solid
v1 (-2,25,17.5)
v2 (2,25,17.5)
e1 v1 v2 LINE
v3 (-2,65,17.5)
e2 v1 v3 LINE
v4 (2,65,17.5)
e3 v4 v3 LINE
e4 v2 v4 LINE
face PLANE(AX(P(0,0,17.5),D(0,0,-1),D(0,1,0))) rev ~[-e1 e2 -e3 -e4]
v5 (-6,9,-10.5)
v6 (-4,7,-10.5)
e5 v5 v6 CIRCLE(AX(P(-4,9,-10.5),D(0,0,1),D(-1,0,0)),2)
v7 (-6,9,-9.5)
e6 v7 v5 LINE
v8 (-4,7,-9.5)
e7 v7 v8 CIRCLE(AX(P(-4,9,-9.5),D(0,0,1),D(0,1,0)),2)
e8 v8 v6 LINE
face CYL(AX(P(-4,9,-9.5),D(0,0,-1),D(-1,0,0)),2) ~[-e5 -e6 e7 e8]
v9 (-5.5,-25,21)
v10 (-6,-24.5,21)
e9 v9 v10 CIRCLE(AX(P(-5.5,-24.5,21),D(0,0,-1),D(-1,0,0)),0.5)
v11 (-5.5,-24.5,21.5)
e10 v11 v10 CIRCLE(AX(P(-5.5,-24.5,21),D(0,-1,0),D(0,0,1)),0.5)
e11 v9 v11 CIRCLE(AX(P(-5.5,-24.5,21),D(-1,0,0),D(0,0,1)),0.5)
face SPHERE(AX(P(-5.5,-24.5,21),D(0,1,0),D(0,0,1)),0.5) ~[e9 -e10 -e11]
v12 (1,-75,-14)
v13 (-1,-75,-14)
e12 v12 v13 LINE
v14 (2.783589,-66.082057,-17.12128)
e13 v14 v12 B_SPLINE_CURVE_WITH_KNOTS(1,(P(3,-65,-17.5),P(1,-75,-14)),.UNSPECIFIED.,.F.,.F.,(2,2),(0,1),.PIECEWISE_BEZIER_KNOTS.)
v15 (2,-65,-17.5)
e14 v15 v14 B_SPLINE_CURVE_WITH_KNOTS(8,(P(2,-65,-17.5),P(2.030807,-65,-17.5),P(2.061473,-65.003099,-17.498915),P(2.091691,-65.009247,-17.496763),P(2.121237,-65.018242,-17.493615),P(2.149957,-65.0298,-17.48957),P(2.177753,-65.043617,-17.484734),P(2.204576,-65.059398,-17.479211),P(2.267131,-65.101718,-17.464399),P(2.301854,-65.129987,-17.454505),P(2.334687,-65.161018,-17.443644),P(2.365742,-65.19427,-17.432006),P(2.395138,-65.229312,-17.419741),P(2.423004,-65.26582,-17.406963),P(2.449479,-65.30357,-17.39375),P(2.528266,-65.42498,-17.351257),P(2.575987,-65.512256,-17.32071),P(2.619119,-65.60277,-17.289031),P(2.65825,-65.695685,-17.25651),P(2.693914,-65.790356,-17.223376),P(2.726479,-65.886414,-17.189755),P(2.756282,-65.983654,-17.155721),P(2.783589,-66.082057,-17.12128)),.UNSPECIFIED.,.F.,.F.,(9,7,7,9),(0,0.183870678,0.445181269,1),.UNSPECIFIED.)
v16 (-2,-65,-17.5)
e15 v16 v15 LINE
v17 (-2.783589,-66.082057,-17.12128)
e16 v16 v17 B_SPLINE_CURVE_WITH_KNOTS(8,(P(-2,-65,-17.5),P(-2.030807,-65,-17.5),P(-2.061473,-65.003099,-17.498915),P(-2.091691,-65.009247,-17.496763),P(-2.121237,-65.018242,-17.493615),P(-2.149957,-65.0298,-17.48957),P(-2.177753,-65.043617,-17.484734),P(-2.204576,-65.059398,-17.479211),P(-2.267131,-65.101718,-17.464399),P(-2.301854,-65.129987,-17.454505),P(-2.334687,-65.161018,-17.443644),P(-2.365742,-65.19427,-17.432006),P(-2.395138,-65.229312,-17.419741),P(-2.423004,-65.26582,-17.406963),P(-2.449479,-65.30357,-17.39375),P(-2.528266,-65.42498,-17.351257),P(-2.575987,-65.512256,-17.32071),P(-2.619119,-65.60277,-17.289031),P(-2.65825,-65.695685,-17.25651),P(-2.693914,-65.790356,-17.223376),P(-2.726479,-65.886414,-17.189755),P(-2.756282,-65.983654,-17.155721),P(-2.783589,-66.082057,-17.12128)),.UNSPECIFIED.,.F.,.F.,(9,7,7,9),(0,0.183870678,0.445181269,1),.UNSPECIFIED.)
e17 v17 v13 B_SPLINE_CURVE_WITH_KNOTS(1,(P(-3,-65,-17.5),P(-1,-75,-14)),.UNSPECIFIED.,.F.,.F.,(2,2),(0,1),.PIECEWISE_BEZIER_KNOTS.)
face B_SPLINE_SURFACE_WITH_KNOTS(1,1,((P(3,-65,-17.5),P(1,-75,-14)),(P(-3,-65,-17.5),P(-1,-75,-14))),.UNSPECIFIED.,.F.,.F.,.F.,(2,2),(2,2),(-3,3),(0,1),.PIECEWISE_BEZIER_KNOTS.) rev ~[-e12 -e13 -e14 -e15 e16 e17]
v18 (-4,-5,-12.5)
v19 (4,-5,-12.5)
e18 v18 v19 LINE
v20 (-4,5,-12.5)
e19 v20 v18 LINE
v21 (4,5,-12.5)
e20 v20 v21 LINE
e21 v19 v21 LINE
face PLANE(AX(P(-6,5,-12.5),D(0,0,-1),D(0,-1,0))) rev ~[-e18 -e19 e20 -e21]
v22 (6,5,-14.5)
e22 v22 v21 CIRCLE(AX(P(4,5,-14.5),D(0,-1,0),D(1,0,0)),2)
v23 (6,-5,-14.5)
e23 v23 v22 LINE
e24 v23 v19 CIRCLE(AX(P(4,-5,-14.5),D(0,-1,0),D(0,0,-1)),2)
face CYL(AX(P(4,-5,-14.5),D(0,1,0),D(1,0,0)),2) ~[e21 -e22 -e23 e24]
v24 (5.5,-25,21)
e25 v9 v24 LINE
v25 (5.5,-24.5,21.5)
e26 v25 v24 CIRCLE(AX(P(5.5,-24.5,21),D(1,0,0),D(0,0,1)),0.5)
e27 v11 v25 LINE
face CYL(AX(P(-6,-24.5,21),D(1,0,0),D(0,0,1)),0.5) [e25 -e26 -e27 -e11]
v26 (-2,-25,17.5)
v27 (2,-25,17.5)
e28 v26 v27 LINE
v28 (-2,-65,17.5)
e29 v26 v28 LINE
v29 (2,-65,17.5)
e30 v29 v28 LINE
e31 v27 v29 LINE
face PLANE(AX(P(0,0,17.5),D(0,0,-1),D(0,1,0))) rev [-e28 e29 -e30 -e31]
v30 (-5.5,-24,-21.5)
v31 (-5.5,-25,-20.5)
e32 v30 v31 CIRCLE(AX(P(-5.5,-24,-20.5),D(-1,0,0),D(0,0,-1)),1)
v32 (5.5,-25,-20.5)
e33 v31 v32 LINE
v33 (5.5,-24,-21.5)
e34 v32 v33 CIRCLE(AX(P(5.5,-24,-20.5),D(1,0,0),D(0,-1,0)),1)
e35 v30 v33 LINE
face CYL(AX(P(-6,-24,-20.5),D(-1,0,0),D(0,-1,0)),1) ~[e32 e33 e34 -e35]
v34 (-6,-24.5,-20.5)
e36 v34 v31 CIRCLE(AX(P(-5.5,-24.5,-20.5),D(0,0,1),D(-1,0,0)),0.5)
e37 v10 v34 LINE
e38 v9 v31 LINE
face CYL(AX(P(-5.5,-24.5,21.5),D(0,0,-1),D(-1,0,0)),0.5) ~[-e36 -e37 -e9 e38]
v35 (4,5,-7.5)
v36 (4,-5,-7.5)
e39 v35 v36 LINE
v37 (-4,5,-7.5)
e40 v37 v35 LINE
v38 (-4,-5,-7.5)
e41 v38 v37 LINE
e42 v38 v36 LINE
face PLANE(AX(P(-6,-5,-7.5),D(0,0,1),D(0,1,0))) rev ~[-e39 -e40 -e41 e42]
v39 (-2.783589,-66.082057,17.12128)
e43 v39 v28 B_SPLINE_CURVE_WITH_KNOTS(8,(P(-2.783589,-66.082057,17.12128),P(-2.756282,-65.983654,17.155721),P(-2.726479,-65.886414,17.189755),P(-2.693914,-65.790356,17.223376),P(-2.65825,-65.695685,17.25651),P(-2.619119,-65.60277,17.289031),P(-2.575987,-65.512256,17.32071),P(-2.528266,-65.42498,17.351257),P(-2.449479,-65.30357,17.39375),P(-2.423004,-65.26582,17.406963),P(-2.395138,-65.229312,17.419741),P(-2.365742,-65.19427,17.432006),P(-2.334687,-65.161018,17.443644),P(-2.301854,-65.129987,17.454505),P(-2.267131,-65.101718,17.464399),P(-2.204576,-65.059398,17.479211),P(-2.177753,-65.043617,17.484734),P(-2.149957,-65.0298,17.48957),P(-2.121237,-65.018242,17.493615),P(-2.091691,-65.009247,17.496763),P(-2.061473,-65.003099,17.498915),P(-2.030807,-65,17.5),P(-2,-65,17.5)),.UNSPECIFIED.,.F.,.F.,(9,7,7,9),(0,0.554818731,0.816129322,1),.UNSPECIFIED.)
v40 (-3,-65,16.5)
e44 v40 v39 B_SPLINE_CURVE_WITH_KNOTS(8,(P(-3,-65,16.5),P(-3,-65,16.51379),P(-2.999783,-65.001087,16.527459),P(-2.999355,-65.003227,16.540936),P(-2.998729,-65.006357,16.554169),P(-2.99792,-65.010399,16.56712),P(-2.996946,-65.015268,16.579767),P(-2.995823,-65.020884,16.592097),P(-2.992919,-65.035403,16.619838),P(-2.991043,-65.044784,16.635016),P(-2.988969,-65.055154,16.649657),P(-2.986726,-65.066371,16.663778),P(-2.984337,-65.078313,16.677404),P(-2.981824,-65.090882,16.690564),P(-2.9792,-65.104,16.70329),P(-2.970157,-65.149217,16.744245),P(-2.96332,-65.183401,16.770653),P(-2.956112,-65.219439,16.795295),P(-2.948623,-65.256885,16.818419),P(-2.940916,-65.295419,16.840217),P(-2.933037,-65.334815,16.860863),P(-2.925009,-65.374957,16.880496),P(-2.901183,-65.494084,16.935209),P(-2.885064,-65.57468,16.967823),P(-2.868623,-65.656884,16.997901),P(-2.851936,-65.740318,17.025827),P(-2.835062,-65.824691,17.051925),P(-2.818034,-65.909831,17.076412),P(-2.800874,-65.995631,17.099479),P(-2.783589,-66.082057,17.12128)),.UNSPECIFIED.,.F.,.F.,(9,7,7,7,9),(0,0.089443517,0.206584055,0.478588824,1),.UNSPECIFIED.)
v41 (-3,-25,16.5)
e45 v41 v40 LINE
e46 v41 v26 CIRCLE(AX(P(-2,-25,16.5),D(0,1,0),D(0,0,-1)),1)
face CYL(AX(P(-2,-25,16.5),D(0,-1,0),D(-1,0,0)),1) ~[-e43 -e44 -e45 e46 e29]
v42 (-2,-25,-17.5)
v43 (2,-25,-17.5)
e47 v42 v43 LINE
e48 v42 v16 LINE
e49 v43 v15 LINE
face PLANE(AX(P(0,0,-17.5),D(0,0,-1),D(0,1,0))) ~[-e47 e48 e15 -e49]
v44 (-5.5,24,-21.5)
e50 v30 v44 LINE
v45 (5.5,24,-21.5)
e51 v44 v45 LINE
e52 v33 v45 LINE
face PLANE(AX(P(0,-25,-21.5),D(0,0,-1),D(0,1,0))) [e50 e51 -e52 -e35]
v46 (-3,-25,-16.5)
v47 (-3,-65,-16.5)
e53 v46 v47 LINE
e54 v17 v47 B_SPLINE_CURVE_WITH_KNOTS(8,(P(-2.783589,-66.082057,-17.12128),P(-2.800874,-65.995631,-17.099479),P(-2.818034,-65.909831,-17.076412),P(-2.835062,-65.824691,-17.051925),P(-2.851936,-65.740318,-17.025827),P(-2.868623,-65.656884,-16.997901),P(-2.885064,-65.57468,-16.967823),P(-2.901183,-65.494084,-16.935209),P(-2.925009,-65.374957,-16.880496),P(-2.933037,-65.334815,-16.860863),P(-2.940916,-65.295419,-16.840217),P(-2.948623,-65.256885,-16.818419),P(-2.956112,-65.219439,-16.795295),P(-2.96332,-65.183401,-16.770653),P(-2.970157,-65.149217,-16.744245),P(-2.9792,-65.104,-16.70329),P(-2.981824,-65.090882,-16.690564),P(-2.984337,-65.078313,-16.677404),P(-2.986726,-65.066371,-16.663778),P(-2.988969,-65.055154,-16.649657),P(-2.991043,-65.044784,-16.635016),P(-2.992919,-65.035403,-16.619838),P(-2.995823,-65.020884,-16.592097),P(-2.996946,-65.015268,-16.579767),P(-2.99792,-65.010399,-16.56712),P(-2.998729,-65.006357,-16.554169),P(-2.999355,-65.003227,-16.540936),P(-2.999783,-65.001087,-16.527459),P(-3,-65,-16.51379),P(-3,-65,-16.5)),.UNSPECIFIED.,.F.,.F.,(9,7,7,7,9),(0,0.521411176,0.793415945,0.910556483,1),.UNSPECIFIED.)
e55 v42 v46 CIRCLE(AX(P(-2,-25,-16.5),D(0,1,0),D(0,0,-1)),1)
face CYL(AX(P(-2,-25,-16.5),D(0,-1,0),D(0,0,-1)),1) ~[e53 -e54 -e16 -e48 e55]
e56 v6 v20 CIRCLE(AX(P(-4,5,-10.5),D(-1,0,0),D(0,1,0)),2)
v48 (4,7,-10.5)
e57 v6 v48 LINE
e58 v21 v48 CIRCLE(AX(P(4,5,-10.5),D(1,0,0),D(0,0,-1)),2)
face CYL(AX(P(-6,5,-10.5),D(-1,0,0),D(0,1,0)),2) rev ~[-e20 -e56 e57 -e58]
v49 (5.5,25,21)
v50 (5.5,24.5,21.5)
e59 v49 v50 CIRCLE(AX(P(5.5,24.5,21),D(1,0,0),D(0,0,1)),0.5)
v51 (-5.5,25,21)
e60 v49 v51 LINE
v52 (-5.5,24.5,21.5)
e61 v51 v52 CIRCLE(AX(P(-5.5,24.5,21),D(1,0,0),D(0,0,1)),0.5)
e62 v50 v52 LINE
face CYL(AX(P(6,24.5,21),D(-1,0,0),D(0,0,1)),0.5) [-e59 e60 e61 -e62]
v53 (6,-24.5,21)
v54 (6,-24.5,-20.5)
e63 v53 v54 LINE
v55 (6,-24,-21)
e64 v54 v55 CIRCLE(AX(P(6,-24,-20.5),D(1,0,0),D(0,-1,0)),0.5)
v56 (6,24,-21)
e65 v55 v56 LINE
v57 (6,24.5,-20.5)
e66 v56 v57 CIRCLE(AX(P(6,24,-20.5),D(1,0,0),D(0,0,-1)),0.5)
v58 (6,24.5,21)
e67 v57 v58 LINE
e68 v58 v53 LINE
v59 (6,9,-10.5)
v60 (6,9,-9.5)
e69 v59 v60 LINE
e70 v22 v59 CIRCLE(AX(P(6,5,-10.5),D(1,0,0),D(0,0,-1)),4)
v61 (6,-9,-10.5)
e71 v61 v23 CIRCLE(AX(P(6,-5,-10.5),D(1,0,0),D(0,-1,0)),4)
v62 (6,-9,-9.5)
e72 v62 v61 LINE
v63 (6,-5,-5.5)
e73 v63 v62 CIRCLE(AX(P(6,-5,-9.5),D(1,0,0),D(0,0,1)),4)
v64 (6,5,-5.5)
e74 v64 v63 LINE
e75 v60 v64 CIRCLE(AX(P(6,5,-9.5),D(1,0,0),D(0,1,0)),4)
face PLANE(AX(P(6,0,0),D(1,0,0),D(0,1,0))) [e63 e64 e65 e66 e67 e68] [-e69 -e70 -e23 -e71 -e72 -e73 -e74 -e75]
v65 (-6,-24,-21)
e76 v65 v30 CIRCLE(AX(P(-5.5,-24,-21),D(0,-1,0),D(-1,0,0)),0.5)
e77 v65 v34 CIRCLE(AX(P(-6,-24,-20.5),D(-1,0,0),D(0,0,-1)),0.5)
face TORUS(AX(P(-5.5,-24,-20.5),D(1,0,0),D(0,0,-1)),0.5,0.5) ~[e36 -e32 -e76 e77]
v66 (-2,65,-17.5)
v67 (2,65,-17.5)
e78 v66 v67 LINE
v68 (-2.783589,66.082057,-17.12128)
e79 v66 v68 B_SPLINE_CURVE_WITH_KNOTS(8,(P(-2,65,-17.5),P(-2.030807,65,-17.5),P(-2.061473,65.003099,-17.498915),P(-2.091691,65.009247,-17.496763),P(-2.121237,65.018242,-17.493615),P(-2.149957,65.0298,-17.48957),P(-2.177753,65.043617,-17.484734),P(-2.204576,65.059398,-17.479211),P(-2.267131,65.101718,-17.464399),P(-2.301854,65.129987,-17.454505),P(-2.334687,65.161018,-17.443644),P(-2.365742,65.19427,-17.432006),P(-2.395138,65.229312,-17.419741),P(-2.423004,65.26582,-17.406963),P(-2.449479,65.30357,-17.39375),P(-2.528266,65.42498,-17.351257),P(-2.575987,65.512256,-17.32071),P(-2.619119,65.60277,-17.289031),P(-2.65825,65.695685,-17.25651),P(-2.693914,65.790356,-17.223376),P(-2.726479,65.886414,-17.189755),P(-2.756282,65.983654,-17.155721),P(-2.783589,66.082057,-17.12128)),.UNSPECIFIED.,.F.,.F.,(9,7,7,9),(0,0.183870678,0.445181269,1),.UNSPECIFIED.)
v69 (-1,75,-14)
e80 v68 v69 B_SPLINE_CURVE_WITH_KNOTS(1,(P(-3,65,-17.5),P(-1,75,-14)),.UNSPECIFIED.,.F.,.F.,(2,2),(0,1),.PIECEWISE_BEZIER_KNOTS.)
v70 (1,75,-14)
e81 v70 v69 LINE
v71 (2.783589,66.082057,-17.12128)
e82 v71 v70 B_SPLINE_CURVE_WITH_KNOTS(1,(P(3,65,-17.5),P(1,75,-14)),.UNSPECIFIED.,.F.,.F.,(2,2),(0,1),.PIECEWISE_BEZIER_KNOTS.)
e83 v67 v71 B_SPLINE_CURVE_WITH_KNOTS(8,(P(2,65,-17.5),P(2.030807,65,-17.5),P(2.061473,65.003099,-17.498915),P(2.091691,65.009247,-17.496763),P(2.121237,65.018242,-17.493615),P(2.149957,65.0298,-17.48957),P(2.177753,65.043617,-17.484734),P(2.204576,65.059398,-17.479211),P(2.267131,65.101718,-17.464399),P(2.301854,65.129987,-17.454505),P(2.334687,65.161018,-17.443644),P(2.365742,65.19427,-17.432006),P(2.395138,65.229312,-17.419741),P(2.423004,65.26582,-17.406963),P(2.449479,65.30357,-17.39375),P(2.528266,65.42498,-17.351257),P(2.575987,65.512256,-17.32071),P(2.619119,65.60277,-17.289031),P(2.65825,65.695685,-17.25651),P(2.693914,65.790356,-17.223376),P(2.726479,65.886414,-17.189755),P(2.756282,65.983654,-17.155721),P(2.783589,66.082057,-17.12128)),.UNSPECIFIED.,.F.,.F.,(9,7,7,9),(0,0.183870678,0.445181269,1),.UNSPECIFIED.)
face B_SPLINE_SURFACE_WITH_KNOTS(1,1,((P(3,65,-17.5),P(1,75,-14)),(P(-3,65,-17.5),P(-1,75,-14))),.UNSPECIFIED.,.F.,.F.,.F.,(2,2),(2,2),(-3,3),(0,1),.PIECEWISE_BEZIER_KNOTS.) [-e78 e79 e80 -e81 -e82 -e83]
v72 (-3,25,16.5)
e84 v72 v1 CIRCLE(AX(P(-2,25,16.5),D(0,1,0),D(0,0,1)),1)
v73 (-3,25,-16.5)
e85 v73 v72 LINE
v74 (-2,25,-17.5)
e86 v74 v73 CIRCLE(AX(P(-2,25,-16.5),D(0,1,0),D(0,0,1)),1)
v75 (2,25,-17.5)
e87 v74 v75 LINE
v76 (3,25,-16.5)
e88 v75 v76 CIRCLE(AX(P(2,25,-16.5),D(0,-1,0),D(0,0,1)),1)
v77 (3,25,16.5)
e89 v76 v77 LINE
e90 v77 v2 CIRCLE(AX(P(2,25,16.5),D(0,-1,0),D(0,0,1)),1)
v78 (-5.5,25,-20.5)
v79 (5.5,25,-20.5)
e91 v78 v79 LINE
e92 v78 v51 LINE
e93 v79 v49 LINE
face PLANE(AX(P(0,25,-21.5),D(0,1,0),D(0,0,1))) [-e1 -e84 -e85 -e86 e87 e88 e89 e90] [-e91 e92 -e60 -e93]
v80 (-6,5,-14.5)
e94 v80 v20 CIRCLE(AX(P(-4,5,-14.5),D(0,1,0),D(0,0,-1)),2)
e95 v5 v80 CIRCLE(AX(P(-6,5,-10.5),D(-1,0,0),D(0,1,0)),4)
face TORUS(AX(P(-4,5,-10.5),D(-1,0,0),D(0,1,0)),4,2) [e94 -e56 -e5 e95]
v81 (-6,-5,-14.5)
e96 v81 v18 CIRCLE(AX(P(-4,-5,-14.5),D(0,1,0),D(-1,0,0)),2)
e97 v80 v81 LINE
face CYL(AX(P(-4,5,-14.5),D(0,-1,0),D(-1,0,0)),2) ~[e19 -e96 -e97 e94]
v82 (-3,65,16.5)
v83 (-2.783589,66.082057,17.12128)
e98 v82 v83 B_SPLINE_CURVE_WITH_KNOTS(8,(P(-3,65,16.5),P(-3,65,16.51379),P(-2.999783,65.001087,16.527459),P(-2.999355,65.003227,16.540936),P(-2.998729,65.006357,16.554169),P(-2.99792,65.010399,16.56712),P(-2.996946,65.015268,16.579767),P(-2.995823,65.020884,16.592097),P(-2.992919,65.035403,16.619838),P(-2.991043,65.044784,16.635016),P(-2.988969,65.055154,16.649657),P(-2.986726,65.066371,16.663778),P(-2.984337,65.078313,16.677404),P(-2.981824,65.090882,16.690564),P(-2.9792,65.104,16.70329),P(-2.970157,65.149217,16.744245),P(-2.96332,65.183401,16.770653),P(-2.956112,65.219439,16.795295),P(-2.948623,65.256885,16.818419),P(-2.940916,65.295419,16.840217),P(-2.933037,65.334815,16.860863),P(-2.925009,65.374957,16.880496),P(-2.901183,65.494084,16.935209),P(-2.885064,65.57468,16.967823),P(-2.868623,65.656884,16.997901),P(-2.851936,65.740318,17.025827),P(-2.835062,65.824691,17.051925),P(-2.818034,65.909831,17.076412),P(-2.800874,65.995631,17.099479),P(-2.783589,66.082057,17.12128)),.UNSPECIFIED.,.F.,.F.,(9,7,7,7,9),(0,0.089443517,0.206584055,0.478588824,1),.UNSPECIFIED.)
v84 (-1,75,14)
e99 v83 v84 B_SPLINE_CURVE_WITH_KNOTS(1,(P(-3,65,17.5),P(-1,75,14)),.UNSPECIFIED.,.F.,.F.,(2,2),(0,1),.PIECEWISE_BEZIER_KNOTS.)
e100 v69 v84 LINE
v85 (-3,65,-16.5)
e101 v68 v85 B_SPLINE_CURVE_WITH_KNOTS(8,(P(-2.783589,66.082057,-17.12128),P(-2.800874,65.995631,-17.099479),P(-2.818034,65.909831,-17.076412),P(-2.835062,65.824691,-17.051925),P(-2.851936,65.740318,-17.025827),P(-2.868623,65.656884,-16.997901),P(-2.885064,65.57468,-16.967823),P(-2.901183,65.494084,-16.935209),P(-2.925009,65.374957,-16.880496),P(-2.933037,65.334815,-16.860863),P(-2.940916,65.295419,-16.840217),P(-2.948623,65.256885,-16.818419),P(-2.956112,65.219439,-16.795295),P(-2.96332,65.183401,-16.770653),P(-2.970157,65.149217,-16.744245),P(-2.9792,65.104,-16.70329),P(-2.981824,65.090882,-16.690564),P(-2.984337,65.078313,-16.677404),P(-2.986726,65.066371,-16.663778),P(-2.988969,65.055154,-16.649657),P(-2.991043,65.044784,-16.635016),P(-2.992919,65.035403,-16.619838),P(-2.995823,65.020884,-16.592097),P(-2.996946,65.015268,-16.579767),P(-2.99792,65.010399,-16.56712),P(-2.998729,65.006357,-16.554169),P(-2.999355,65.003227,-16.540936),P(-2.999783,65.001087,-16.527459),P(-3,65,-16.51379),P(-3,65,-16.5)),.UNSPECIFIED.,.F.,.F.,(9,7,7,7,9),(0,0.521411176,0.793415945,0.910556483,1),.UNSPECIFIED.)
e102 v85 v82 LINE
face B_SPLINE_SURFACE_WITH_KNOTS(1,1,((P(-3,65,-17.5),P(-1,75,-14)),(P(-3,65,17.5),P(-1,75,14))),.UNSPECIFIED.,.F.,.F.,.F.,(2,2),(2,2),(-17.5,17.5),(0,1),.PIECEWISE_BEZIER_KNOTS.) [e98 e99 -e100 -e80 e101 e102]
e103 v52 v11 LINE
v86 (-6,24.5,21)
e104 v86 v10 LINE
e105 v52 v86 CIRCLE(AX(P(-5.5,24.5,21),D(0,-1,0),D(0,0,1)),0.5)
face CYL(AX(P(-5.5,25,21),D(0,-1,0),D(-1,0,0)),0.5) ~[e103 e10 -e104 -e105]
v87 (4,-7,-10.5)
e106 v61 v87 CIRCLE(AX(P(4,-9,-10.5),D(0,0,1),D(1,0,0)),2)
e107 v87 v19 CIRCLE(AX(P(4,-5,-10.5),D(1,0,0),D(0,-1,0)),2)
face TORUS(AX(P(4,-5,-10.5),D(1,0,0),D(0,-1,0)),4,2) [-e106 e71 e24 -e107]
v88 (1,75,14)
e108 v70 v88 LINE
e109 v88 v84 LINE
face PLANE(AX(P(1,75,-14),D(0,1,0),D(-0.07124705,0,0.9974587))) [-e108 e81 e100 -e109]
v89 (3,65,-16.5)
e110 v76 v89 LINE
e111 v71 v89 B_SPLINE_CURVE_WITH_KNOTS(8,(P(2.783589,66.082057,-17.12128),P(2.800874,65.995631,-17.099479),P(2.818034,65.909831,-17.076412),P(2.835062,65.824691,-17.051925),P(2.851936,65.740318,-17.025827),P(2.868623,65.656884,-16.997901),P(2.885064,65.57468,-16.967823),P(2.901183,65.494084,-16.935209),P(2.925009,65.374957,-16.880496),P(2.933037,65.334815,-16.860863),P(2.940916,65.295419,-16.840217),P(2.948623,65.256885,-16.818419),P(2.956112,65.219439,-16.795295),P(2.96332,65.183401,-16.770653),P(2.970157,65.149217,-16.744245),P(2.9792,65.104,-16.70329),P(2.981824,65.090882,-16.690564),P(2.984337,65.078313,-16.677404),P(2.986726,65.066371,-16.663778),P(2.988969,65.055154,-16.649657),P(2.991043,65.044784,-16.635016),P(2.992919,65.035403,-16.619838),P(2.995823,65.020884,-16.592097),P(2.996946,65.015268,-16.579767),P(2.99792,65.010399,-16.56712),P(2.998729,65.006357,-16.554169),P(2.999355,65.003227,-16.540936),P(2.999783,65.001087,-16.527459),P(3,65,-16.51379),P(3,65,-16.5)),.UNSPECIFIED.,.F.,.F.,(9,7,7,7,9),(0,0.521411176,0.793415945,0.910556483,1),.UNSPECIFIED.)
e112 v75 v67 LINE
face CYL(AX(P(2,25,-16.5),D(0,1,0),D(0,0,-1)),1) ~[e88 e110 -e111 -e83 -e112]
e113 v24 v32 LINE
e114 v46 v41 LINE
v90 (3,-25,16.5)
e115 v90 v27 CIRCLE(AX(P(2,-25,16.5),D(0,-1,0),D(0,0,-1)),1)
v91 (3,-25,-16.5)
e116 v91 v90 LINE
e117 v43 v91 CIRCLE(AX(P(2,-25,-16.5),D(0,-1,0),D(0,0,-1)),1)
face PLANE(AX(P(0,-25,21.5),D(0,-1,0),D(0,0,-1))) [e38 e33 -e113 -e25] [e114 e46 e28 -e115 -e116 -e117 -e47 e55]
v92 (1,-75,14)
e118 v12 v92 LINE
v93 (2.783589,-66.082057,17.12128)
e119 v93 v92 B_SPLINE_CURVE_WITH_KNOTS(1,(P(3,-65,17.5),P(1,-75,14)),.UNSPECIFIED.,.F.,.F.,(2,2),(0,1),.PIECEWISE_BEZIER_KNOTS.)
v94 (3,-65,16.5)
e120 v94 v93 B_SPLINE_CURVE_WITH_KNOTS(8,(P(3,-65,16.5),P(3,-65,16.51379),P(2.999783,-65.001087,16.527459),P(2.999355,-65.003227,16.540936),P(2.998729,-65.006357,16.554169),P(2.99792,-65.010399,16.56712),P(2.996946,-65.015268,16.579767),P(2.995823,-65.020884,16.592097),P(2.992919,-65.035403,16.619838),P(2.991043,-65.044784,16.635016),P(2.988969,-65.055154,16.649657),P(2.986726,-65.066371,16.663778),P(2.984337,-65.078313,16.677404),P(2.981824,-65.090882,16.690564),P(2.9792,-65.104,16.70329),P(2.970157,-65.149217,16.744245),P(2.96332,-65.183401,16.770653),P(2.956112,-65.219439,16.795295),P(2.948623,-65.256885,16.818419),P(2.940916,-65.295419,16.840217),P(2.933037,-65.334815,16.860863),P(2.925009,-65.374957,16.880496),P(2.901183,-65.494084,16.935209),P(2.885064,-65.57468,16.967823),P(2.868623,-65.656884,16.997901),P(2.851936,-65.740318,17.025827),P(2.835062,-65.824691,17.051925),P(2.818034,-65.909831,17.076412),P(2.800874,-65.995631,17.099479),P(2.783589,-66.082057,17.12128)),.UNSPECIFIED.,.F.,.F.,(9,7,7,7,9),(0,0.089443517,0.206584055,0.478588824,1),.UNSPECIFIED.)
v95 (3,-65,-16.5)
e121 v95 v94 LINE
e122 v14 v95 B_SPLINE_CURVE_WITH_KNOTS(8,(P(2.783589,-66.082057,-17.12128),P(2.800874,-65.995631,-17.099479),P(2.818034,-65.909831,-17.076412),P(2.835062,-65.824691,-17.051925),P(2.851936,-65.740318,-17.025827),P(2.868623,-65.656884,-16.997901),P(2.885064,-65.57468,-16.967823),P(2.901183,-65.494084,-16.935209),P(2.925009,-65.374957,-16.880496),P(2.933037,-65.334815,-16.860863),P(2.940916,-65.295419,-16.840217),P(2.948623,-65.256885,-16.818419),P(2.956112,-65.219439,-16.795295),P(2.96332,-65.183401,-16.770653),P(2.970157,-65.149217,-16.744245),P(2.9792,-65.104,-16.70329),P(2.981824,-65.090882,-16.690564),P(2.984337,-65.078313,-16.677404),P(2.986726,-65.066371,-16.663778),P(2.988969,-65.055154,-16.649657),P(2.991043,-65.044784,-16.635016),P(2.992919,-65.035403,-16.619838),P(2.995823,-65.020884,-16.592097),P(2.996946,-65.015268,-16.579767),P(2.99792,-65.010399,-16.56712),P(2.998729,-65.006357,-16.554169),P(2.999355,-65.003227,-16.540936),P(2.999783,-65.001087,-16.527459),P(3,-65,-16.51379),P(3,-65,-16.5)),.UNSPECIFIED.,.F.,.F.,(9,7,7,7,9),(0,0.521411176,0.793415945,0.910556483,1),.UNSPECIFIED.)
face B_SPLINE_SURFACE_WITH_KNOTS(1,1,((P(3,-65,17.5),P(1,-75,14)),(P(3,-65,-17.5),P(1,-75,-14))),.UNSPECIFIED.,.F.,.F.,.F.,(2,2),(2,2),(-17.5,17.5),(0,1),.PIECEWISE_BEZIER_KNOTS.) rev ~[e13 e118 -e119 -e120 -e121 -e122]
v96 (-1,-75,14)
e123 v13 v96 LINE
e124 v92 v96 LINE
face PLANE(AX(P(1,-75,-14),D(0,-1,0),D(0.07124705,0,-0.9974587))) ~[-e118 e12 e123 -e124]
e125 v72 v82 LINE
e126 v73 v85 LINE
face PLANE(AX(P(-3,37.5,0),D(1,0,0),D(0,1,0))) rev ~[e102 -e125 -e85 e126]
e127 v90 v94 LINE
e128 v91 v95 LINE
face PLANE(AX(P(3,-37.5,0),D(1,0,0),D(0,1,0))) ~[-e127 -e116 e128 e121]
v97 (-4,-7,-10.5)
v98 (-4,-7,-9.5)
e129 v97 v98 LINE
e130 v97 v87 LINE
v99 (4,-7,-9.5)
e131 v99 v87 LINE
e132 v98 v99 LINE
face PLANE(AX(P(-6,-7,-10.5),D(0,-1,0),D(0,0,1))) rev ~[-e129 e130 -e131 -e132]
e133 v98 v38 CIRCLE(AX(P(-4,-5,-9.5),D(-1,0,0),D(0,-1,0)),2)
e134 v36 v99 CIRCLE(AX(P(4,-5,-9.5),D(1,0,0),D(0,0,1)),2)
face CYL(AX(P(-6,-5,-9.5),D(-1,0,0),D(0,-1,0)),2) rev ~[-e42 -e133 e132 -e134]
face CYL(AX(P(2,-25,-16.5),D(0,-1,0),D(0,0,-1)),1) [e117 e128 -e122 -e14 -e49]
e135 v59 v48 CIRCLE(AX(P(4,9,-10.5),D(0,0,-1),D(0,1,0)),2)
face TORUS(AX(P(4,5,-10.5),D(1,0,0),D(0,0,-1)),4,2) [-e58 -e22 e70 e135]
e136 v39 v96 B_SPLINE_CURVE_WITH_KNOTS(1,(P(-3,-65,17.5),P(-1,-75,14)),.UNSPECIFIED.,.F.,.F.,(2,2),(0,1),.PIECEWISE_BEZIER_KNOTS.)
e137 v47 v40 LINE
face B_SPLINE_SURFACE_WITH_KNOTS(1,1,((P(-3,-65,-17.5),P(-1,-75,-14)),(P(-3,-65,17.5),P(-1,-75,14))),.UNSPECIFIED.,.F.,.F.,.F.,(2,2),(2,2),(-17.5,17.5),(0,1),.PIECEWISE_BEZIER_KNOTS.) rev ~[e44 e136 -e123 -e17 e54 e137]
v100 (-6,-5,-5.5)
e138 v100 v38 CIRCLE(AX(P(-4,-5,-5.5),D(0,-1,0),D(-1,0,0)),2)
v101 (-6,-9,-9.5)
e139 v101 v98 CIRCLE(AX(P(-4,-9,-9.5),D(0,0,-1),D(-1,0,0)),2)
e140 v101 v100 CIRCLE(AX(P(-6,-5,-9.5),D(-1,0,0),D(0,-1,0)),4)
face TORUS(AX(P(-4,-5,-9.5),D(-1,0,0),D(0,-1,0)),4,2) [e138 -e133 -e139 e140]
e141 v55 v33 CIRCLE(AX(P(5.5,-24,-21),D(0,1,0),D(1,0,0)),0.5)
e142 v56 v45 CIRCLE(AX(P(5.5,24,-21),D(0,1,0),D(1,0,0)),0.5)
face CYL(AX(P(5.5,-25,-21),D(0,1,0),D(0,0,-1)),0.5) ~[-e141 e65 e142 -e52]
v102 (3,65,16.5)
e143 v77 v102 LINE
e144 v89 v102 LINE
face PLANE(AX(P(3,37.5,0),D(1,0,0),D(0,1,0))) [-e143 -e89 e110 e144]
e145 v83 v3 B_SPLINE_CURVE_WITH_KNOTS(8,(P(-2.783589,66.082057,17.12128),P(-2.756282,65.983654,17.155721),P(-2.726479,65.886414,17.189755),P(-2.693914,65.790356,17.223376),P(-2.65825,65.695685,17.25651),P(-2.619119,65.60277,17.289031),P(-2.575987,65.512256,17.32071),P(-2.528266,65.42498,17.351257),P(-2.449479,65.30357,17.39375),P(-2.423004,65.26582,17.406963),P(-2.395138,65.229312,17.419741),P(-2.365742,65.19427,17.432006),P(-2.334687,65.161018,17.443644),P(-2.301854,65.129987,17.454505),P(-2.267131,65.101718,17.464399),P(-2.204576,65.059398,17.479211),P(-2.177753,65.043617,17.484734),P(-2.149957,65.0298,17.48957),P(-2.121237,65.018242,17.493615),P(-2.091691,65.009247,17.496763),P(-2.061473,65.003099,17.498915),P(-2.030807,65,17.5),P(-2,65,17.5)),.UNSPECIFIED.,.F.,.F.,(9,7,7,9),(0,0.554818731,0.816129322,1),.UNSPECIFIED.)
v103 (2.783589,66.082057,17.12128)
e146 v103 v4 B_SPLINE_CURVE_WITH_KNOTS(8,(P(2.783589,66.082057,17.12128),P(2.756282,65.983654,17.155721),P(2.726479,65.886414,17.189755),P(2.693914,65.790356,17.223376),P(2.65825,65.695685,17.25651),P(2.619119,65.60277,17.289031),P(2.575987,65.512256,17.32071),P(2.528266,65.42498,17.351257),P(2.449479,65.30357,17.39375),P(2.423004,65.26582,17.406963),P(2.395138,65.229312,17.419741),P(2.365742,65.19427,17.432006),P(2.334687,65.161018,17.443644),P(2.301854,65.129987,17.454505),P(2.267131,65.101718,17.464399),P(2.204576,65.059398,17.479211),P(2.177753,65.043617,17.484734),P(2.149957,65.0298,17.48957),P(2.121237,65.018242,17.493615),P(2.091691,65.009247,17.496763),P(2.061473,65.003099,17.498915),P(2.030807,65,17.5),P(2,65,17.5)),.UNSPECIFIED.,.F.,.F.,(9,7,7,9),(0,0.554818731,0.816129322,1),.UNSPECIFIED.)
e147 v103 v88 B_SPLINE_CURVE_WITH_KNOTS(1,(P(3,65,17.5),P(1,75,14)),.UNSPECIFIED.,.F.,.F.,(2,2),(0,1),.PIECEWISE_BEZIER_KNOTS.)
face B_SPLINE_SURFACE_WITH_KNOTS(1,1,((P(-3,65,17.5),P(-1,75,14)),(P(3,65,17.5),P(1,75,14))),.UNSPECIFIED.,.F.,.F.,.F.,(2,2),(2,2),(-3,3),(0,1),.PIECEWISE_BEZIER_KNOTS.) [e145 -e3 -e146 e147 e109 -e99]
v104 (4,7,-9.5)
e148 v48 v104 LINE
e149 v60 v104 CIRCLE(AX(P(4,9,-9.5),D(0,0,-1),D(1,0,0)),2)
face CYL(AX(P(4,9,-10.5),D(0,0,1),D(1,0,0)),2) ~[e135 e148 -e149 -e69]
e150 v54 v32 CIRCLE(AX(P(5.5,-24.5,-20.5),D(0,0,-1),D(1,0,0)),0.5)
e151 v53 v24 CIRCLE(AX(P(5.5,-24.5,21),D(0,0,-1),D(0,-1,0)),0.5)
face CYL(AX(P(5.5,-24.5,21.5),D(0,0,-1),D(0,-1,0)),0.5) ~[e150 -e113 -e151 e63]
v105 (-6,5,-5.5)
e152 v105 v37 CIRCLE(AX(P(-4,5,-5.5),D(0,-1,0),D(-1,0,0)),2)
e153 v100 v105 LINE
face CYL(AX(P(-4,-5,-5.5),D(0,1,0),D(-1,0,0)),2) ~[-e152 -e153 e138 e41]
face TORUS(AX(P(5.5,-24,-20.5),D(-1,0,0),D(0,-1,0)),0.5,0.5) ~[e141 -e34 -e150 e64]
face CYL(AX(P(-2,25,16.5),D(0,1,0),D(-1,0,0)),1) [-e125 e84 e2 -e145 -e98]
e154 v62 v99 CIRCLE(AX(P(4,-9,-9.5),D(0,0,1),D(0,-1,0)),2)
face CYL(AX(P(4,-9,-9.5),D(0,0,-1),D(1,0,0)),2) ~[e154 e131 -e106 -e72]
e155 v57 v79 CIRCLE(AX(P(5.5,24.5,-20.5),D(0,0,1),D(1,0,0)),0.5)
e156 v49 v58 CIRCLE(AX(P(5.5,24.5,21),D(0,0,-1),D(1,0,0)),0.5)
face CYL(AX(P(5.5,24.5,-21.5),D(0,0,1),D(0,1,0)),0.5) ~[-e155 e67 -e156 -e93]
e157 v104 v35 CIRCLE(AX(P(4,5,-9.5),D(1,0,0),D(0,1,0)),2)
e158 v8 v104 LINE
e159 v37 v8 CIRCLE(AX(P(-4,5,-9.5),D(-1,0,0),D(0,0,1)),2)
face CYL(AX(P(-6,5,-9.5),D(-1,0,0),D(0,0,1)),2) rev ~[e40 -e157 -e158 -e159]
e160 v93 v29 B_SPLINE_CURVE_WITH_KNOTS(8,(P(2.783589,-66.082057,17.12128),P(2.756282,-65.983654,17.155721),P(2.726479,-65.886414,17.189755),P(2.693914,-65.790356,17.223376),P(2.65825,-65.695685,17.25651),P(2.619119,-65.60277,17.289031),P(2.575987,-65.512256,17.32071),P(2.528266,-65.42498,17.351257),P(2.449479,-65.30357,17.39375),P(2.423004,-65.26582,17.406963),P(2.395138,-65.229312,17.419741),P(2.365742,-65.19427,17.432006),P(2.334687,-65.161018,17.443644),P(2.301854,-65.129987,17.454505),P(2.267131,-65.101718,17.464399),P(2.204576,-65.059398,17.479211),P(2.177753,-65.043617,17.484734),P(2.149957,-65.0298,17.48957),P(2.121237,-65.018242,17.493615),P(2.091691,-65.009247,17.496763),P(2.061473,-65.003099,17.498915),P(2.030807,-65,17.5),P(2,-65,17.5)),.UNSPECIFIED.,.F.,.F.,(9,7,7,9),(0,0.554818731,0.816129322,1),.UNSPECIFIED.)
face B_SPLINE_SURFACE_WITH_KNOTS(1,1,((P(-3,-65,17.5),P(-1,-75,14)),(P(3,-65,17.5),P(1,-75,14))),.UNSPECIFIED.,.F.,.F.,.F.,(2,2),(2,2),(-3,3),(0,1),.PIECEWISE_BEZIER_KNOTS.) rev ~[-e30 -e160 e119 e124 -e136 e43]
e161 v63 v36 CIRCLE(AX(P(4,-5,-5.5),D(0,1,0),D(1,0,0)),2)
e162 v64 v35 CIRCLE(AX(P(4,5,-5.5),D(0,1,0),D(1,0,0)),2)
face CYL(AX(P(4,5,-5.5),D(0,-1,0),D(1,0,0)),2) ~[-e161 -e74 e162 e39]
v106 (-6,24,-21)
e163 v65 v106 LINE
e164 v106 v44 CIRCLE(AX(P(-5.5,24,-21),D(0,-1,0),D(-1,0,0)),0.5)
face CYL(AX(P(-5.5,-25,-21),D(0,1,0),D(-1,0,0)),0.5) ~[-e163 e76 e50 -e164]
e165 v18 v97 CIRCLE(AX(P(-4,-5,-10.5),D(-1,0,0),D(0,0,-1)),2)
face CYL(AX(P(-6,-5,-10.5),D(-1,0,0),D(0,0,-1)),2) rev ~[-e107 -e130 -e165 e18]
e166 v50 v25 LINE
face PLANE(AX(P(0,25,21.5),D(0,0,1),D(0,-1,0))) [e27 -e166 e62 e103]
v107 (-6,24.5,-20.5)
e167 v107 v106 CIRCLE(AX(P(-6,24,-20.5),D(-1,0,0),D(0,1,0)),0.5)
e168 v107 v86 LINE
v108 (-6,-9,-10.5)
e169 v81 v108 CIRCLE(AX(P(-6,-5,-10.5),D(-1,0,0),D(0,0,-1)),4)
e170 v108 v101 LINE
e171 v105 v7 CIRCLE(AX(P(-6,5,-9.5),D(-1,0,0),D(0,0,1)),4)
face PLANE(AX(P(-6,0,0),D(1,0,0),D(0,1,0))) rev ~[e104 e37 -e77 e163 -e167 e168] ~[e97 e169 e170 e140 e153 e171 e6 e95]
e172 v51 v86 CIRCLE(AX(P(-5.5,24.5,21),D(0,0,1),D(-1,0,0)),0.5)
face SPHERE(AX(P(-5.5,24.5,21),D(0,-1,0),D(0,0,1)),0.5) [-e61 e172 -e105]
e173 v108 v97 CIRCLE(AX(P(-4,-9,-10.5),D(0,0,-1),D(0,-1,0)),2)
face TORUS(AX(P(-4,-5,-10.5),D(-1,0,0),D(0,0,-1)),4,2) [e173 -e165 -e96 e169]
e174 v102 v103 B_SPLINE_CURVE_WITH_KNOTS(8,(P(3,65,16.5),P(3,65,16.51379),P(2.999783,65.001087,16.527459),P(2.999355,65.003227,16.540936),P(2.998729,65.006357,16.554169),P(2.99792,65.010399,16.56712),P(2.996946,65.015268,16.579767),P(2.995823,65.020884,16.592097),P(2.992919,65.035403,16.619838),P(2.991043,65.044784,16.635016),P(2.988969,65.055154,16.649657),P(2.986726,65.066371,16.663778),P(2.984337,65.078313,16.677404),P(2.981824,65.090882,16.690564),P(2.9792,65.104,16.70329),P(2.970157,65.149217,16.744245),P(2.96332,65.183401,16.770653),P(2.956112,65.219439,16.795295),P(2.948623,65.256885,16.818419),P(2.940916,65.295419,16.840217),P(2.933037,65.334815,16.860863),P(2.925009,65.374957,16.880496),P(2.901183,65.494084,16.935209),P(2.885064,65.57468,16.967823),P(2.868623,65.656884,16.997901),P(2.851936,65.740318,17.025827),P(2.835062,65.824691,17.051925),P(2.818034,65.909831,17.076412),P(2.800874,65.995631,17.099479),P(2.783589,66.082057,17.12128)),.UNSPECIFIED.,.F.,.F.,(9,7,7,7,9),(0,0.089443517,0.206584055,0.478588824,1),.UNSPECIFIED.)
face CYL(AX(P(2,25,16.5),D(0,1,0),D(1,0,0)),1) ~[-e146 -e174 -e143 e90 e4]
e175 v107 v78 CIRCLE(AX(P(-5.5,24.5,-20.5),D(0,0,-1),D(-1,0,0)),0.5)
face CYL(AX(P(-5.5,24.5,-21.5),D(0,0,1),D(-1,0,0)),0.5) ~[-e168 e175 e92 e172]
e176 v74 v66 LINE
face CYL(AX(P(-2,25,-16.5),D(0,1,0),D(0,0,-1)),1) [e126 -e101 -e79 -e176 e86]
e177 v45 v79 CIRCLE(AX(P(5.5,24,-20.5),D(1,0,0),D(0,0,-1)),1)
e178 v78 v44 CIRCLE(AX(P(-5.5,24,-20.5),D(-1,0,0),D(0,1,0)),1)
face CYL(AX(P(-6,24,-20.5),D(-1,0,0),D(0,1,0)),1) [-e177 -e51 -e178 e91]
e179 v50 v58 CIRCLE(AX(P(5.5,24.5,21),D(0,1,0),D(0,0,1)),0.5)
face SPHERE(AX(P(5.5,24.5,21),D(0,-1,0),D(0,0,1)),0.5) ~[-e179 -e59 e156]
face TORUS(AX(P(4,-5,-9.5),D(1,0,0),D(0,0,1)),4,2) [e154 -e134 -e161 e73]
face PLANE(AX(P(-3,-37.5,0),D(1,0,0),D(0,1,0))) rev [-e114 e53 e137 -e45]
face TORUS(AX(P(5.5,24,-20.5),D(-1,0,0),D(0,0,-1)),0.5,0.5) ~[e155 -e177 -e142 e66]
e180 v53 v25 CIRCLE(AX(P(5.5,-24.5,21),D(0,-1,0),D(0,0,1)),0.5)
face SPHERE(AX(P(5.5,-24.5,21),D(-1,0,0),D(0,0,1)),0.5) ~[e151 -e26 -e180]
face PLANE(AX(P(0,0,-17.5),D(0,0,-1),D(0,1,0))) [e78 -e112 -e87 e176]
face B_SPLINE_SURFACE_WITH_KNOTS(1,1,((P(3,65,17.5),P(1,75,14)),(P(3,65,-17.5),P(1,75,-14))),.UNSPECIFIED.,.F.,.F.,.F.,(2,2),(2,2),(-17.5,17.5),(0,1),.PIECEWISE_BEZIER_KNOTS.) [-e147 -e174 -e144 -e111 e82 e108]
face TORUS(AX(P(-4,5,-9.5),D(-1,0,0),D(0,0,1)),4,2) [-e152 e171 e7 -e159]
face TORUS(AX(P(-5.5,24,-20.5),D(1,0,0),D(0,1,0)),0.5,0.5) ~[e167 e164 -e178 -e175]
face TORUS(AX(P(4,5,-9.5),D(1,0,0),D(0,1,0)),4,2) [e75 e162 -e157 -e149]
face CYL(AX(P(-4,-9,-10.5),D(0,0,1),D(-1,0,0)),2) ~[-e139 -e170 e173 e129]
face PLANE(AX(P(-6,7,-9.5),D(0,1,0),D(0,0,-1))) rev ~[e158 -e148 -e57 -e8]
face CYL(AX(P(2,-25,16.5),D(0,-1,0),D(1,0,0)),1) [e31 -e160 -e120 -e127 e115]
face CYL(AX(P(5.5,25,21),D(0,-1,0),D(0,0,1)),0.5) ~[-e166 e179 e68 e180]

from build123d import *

# Parameters (mm, degrees)
F0_W          = 75
F0_H          = 35
F1_DEPTH      = 3
F4_W          = 10.7173770666
F4_H          = 34.9826700985
F5_DEPTH      = 25
F7_W          = 6
F7_H          = 35
F7_W_2        = 2
F7_H_2        = 28
F8_DEPTH      = 10
F9_DEPTH      = 10
F9_FACE_W     = 6
F9_FACE_H     = 35
F11_W         = 2
F11_H         = 28
F14_DEPTH     = 6
F16_DEPTH     = 25
F17_R         = 2
F18_R         = 0.5
F20_T1_DEPTH  = 12
F20_T4_ANGLE  = 90
F20_T6_ANGLE  = 90
F20_T8_ANGLE  = 90
F20_T10_ANGLE = 90
F21_R         = 1


# Not quite as in the source:
# - a fillet or chamfer that OpenCascade refuses, or shapes differently, is made with other operations: its cross-section is extruded or revolved along the edge and cut away or added
# - a feature of the source that left no trace in its solid (it failed there, or was rolled back) is left out
# - a feature names something its author has since deleted; it is built from what else it names


with BuildPart() as f1:
    # F0 (on Right) → F1 (new body, symmetric)
    with BuildSketch(Plane.YZ):
        with Locations((37.5, 0)):
            Rectangle(F0_W, F0_H)
    extrude(amount=F1_DEPTH, both=True)

    # F4 (on offset) → F5 (cut)
    with BuildSketch(Plane.XZ.offset(-10)):
        Rectangle(F4_W, F4_H)
    extrude(amount=F5_DEPTH, mode=Mode.SUBTRACT)

    # F7 (on face) → F8 (cut)
    with BuildSketch(Plane(origin=(0, 75, 0), x_dir=(-1, 0, 0), z_dir=(0, 1, 0))):
        Rectangle(F7_W, F7_H)
        Rectangle(F7_W_2, F7_H_2, mode=Mode.SUBTRACT)
    extrude(amount=F8_DEPTH, mode=Mode.SUBTRACT)

    # F9 (cut): a face of the model
    f9_faces = [f1.faces().sort_by_distance(p)[0] for p in [
        (0, 75, 0),
    ]]
    extrude(f9_faces, amount=-F9_DEPTH, mode=Mode.SUBTRACT)

    # F9_face (on face) → F12 section 0
    with BuildSketch(Plane(origin=(0, 65, 0), x_dir=(-1, 0, 0), z_dir=(0, 1, 0))):
        Rectangle(F9_FACE_W, F9_FACE_H)
    # F11 (on offset) → F12 section 1
    with BuildSketch(Plane(origin=(0, 75, 0), x_dir=(-1, 0, 0), z_dir=(0, 1, 0))):
        Rectangle(F11_W, F11_H)
    loft()

    # F13 (on Right) → F14 (join, symmetric)
    with BuildSketch(Plane.YZ):
        Polygon((25, 21.5), (0, 21.5), (-25, 21.5), (-25, 0), (-25, -21.5), (0, -21.5), (25, -21.5), (25, 0), align=None)
    extrude(amount=F14_DEPTH, both=True)

    # F15 (on face) → F16 (cut)
    with BuildSketch(Plane(origin=(-6, 0, 0), x_dir=(0, -1, 0), z_dir=(-1, 0, 0))):
        with BuildLine():
            Line((-5, -12.5), (5, -12.5))
            ThreePointArc((5, -12.5), (6.4142135624, -11.9142135624), (7, -10.5))
            Line((7, -10.5), (7, -9.5))
            ThreePointArc((7, -9.5), (6.4142135624, -8.0857864376), (5, -7.5))
            Line((5, -7.5), (-5, -7.5))
            ThreePointArc((-5, -7.5), (-6.4142135624, -8.0857864376), (-7, -9.5))
            Line((-7, -9.5), (-7, -10.5))
            ThreePointArc((-7, -10.5), (-6.4142135624, -11.9142135624), (-5, -12.5))
        make_face()
    extrude(amount=-F16_DEPTH, mode=Mode.SUBTRACT)

    # F17
    f17_edges = [f1.edges().sort_by_distance(p)[0] for p in [
        (6, 0, -7.5),
        (6, -6.414214, -8.085786),
        (6, -7, -10),
        (6, -6.414214, -11.914214),
        (6, 0, -12.5),
        (6, 6.414214, -8.085786),
        (6, 7, -10),
        (6, 6.414214, -11.914214),
        (-6, 0, -7.5),
        (-6, -6.414214, -8.085786),
        (-6, -7, -10),
        (-6, -6.414214, -11.914214),
        (-6, 0, -12.5),
        (-6, 6.414214, -11.914214),
        (-6, 7, -10),
        (-6, 6.414214, -8.085786),
    ]]
    fillet(f17_edges, radius=F17_R)

    # F18
    f18_edges = [f1.edges().sort_by_distance(p)[0] for p in [
        (-6, 0, 21.5),
        (0, -25, 21.5),
        (6, 0, 21.5),
        (0, 25, 21.5),
        (6, 0, -5.5),
        (6, 7.828427, -6.671573),
        (6, -7.828427, -6.671573),
        (6, 9, -10),
        (6, -9, -10),
        (6, 7.828427, -13.328427),
        (6, -7.828427, -13.328427),
        (6, 0, -14.5),
        (6, -25, 0),
        (6, 25, 0),
        (6, 0, -21.5),
        (-6, 0, -5.5),
        (-6, -7.828427, -6.671573),
        (-6, 7.828427, -6.671573),
        (-6, -9, -10),
        (-6, 9, -10),
        (-6, -7.828427, -13.328427),
        (-6, 7.828427, -13.328427),
        (-6, 0, -14.5),
        (-6, 25, 0),
        (-6, -25, 0),
        (-6, 0, -21.5),
    ]]
    fillet(f18_edges, radius=F18_R)

    # F19: F1 across plane


with BuildPart() as f1_1:
    add(f1.part)
    add(f1.part.mirror(Plane.XZ))

    # F20: fillet of radius 1 on 2 edges, made by hand

    # F20_s2 → F20_t1 (cut)
    with BuildSketch(Plane.YZ.offset(-6)):
        with BuildLine():
            ThreePointArc((25, -20.5), (24.7071067812, -21.2071067812), (24, -21.5))
            Line((24, -21.5), (25, -21.5))
            Line((25, -21.5), (25, -20.5))
        make_face()
        with BuildLine():
            ThreePointArc((-25, -20.5), (-24.7071067812, -21.2071067812), (-24, -21.5))
            Line((-24, -21.5), (-25, -21.5))
            Line((-25, -21.5), (-25, -20.5))
        make_face()
    extrude(amount=F20_T1_DEPTH, mode=Mode.SUBTRACT)

    # F20_s3 → F20_t4 (revolve, cut)
    with BuildSketch(Plane.XZ.offset(24)):
        with BuildLine():
            ThreePointArc((-6, -21), (-5.8535533906, -21.3535533906), (-5.5, -21.5))
            Line((-5.5, -21.5), (-6, -21.5))
            Line((-6, -21.5), (-6, -21))
        make_face()
    revolve(axis=Axis((-6, -24, -20.5), (-1, 0, 0)), revolution_arc=F20_T4_ANGLE, mode=Mode.SUBTRACT)

    # F20_s5 → F20_t6 (revolve, cut)
    with BuildSketch(Plane.XY.offset(-20.5)):
        with BuildLine():
            ThreePointArc((6, -24.5), (5.8535533906, -24.8535533906), (5.5, -25))
            Line((5.5, -25), (6, -25))
            Line((6, -25), (6, -24.5))
        make_face()
    revolve(axis=Axis((6, -24, -20.5), (1, 0, 0)), revolution_arc=F20_T6_ANGLE, mode=Mode.SUBTRACT)

    # F20_s7 → F20_t8 (revolve, cut)
    with BuildSketch(Plane.XZ.offset(-24)):
        with BuildLine():
            ThreePointArc((6, -21), (5.8535533906, -21.3535533906), (5.5, -21.5))
            Line((5.5, -21.5), (6, -21.5))
            Line((6, -21.5), (6, -21))
        make_face()
    revolve(axis=Axis((6, 24, -20.5), (1, 0, 0)), revolution_arc=F20_T8_ANGLE, mode=Mode.SUBTRACT)

    # F20_s9 → F20_t10 (revolve, cut)
    with BuildSketch(Plane.XY.offset(-20.5)):
        with BuildLine():
            ThreePointArc((-6, 24.5), (-5.8535533906, 24.8535533906), (-5.5, 25))
            Line((-5.5, 25), (-6, 25))
            Line((-6, 25), (-6, 24.5))
        make_face()
    revolve(axis=Axis((-6, 24, -20.5), (-1, 0, 0)), revolution_arc=F20_T10_ANGLE, mode=Mode.SUBTRACT)

    # F21
    f21_edges = [f1_1.edges().sort_by_distance(p)[0] for p in [
        (3, 45, -17.5),
        (3, 45, 17.5),
        (-3, 45, 17.5),
        (-3, 45, -17.5),
        (-3, -45, 17.5),
        (-3, -45, -17.5),
        (3, -45, -17.5),
        (3, -45, 17.5),
    ]]
    fillet(f21_edges, radius=F21_R)


solid = f1_1.part
